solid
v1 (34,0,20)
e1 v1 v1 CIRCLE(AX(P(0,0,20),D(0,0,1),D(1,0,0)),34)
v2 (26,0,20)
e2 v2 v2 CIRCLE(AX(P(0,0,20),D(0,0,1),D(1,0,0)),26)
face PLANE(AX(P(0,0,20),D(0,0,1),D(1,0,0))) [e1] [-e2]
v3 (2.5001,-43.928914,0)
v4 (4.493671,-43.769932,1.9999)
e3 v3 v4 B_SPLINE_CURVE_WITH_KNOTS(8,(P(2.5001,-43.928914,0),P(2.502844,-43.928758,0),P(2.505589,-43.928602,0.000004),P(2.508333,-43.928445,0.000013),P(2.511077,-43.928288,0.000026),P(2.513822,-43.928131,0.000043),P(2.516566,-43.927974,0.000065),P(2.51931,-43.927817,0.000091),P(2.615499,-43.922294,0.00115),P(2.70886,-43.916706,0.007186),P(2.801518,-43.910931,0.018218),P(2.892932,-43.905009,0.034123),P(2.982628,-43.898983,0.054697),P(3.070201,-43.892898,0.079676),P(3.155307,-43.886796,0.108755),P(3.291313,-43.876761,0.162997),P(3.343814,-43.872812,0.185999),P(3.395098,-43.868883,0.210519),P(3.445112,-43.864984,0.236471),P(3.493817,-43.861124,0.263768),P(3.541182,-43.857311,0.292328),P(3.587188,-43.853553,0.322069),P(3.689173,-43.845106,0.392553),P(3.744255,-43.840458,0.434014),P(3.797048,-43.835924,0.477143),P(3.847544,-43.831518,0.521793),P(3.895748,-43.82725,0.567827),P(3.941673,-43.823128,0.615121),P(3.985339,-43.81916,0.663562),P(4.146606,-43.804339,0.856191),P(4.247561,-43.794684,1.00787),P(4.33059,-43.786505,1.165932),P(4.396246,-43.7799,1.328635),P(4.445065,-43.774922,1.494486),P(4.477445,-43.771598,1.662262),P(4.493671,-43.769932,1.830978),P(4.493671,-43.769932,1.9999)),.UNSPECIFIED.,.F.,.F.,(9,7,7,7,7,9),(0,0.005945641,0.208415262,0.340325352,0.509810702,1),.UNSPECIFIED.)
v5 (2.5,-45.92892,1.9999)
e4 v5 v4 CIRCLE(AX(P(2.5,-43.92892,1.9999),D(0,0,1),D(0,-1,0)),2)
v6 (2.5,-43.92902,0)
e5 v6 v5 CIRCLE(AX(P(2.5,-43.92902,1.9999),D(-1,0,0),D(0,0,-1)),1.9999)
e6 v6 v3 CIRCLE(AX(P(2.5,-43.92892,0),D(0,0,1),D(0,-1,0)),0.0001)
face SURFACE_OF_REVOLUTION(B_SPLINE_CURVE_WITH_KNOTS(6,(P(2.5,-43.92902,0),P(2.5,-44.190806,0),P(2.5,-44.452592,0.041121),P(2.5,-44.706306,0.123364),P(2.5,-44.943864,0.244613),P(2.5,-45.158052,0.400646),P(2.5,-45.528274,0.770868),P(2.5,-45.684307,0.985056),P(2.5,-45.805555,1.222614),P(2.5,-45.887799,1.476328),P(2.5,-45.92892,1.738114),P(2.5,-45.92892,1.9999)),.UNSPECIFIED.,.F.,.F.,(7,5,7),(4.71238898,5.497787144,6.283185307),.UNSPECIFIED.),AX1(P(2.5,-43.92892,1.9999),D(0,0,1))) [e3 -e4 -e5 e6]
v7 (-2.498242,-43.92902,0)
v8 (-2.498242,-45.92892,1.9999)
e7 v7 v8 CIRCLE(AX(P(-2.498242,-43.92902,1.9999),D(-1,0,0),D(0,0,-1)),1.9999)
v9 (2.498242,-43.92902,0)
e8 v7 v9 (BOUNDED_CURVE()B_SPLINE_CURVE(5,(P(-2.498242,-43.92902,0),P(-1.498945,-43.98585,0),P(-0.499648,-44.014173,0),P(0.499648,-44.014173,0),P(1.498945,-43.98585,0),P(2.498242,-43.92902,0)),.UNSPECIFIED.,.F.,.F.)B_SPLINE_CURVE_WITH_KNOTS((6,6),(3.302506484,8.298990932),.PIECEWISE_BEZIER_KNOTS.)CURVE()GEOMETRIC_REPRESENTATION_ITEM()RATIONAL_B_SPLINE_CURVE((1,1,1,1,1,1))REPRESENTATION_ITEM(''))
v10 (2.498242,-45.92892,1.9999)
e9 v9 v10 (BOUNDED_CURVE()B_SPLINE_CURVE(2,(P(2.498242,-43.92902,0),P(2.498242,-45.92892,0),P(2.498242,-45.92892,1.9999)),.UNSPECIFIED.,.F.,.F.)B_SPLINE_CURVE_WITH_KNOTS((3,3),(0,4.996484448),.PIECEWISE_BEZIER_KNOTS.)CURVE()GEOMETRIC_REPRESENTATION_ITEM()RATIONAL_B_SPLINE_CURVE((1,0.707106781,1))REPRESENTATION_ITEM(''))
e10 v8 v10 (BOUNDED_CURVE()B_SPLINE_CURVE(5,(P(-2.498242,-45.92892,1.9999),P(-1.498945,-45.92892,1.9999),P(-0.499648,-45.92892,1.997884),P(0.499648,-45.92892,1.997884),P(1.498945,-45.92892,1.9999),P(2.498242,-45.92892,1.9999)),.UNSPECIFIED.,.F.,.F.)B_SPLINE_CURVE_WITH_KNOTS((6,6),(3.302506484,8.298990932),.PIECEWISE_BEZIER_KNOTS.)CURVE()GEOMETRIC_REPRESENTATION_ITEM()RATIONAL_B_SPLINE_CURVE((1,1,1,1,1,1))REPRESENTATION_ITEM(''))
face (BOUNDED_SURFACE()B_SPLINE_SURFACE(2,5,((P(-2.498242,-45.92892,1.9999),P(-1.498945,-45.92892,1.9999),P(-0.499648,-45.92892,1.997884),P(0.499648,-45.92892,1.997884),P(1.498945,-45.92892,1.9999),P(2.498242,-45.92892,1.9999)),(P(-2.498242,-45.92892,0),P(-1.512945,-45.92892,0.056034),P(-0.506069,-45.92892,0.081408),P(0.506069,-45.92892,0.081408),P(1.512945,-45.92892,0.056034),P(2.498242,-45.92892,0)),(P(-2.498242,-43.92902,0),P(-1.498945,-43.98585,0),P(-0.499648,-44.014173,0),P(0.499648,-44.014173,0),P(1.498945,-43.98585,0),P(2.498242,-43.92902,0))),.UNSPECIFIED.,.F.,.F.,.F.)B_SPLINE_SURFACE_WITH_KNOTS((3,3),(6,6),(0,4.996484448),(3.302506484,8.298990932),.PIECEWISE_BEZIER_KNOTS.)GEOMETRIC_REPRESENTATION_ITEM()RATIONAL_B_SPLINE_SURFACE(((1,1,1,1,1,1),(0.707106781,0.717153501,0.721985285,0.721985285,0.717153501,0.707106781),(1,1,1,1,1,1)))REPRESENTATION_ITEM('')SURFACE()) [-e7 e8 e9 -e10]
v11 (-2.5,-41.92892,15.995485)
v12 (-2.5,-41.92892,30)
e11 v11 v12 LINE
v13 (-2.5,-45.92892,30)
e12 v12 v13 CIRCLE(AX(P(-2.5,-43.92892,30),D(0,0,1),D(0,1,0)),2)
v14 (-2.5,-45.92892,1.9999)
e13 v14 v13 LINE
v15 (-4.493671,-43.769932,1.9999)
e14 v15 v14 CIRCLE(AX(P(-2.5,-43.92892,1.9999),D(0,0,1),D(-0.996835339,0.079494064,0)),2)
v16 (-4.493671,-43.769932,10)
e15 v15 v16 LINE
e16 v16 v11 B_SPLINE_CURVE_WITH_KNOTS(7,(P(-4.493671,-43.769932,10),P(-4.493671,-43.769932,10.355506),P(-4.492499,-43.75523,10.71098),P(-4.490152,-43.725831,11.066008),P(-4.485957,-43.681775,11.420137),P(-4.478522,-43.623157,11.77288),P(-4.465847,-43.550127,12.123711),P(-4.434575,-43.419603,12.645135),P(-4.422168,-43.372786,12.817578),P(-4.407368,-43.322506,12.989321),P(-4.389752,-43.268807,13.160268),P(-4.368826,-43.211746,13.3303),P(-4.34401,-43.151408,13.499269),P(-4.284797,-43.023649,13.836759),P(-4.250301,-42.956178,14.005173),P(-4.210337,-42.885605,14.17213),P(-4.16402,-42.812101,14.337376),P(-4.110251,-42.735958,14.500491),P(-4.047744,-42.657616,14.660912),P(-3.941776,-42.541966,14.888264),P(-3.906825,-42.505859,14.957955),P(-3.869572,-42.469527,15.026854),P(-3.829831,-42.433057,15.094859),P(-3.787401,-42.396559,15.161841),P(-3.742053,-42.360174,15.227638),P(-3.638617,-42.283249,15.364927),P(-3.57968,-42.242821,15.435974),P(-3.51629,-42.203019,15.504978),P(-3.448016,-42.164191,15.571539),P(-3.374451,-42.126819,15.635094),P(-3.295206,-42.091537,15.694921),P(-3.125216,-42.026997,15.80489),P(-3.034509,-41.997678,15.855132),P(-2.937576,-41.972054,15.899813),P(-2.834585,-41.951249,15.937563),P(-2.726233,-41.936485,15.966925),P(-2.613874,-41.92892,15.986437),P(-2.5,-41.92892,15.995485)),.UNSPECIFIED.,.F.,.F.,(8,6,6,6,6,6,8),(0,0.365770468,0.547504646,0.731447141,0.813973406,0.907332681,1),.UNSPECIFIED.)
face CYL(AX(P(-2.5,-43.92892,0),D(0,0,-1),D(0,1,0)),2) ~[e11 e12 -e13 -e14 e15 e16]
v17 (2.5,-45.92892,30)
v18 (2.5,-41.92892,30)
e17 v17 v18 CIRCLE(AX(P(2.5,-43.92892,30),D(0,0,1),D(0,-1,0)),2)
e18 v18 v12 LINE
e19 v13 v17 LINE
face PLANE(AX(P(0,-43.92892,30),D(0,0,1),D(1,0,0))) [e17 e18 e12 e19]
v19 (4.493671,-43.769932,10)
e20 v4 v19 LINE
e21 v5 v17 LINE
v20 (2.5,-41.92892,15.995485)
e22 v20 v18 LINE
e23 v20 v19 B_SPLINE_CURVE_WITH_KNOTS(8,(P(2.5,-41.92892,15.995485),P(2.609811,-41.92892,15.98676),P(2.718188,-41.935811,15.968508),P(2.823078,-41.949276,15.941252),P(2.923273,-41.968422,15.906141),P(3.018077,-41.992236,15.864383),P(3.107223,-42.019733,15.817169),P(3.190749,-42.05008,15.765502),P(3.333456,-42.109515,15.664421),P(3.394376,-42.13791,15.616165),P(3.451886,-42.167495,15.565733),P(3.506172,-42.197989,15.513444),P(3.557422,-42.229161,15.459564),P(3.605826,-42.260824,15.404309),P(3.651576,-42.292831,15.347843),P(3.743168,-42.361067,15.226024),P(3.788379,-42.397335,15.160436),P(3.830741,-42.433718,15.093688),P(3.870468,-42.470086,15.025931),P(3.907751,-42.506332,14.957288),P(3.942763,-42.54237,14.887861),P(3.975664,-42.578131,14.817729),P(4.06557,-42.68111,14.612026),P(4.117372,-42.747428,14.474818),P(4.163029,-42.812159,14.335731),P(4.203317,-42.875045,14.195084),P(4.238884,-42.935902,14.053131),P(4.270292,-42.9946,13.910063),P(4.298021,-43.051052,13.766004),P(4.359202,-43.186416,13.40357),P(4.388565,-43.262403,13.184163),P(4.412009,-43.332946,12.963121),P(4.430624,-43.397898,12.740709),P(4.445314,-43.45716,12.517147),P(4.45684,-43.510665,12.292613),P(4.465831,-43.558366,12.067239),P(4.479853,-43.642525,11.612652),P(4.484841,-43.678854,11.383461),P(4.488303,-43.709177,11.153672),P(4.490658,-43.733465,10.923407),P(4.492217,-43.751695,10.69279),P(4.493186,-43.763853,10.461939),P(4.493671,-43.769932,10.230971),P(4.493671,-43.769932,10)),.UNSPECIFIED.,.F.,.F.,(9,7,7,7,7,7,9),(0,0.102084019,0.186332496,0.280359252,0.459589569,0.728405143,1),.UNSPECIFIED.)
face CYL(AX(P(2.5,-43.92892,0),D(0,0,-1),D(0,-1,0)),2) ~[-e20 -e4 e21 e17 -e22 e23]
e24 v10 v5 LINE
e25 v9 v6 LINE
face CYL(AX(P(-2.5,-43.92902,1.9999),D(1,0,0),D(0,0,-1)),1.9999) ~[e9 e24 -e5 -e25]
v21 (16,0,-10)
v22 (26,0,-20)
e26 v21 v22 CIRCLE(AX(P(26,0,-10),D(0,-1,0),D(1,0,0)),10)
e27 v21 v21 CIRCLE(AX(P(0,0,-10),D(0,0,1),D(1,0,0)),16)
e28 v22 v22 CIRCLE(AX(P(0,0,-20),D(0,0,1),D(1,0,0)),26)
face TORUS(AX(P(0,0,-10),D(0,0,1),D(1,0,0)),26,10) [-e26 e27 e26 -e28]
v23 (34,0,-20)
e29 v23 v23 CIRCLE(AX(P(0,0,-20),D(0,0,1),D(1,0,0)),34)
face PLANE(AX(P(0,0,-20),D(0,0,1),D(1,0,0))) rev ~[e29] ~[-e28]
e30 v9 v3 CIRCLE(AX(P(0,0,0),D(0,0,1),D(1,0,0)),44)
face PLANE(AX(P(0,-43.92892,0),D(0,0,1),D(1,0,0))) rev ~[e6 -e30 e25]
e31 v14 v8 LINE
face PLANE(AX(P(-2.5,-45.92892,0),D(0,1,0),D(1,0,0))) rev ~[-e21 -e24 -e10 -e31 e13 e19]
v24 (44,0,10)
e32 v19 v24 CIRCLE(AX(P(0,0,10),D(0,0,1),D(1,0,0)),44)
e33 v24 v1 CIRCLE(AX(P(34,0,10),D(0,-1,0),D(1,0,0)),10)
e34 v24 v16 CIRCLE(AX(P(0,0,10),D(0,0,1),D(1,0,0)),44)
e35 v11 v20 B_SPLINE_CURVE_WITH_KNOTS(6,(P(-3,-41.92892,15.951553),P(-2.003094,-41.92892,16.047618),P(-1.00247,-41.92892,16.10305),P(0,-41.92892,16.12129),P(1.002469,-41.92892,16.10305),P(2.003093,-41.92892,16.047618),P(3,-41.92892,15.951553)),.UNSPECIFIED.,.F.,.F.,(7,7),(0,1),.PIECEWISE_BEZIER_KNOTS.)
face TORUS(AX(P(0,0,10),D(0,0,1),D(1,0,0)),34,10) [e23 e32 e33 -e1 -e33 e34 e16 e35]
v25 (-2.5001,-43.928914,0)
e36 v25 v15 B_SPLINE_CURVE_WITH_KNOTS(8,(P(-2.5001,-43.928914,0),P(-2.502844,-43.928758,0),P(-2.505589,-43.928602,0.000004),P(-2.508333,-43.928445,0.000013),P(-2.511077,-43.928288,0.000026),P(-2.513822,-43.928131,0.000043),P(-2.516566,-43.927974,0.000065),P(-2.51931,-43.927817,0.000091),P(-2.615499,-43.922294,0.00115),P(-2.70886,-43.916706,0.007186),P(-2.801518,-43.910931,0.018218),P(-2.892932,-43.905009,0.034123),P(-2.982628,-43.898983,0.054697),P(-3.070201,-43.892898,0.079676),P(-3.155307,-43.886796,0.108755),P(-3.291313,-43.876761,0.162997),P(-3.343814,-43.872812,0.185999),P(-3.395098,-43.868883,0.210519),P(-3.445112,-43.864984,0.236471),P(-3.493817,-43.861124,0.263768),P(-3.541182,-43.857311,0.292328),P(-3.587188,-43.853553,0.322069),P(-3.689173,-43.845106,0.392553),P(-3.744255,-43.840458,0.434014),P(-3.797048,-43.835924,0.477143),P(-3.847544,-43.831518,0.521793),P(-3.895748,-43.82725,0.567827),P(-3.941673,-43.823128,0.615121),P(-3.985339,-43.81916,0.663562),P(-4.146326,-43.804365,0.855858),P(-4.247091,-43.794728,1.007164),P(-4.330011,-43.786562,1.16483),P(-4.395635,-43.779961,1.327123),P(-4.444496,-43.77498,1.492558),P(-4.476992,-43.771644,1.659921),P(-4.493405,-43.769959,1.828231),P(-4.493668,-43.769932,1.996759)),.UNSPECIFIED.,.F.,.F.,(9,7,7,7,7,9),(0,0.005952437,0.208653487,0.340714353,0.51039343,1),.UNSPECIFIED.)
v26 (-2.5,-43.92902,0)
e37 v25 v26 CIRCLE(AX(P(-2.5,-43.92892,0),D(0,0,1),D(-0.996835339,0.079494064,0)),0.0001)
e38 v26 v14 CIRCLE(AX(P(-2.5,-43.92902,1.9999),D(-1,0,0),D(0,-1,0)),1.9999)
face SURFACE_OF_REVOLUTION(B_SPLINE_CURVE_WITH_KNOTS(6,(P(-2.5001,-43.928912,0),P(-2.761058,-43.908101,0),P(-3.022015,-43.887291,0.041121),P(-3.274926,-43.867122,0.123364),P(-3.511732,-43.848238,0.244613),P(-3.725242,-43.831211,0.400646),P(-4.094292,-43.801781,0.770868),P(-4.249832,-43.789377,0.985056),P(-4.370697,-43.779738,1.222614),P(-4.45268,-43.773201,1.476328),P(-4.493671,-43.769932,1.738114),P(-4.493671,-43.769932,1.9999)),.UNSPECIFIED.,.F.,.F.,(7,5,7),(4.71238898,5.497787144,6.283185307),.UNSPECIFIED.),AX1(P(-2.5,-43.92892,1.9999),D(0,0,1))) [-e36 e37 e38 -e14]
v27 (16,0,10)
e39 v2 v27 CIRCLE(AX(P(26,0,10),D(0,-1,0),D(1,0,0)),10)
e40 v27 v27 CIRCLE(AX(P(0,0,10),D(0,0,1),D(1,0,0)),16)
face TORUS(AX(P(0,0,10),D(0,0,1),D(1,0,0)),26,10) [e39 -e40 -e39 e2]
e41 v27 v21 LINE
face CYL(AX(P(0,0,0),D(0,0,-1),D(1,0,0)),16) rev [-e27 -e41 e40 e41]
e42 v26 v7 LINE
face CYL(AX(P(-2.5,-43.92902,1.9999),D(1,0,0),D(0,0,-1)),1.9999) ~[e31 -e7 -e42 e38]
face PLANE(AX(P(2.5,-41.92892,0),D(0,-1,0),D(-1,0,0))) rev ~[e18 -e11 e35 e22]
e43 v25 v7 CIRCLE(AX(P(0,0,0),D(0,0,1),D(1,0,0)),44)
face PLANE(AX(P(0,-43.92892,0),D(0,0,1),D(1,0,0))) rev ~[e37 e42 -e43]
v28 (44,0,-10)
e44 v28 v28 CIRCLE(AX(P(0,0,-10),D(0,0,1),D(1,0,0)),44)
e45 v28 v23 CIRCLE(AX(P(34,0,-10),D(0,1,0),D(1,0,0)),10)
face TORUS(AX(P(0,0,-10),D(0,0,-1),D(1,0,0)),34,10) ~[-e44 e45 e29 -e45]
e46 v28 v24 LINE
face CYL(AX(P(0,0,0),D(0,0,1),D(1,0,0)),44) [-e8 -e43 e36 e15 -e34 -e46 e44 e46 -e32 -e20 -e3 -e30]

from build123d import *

# Parameters (mm, degrees)
F0_R     = 44
F0_R_2   = 16
F1_DEPTH = 20
F2_R     = 10
F4_DEPTH = 30
F5_R     = 1.9999


# Not quite as in the source:
# - a fillet or chamfer is up to 0.001 mm smaller than in the source, because OpenCascade refuses the exact size


with BuildPart() as f1:
    # F0 (on Top) → F1 (new body, symmetric)
    with BuildSketch(Plane.XY):
        Circle(F0_R)
        Circle(F0_R_2, mode=Mode.SUBTRACT)
    extrude(amount=F1_DEPTH, both=True)

    # F2
    f2_edges = [f1.edges().sort_by_distance(p)[0] for p in [
        (-16, 0, 20),
        (16, 0, 0),
        (-16, 0, -20),
        (-44, 0, -20),
        (44, 0, 0),
        (-44, 0, 20),
    ]]
    fillet(f2_edges, radius=F2_R)

    # F3 (on Top) → F4 (join)
    with BuildSketch(Plane.XY):
        with BuildLine():
            Line((2.5, -41.9289198592), (-2.5, -41.9289198592))
            ThreePointArc((-2.5, -41.9289198592), (-4.5, -43.9289198592), (-2.5, -45.9289198592))
            Line((-2.5, -45.9289198592), (2.5, -45.9289198592))
            ThreePointArc((2.5, -45.9289198592), (4.5, -43.9289198592), (2.5, -41.9289198592))
        make_face()
    extrude(amount=F4_DEPTH)

    # F5 (radius 2 in the source; OpenCascade refuses exactly that, so slightly less here)
    f5_edges = [f1.edges().sort_by_distance(p)[0] for p in [
        (0, -45.92892, 0),
    ]]
    fillet(f5_edges, radius=F5_R)


solid = f1.part
